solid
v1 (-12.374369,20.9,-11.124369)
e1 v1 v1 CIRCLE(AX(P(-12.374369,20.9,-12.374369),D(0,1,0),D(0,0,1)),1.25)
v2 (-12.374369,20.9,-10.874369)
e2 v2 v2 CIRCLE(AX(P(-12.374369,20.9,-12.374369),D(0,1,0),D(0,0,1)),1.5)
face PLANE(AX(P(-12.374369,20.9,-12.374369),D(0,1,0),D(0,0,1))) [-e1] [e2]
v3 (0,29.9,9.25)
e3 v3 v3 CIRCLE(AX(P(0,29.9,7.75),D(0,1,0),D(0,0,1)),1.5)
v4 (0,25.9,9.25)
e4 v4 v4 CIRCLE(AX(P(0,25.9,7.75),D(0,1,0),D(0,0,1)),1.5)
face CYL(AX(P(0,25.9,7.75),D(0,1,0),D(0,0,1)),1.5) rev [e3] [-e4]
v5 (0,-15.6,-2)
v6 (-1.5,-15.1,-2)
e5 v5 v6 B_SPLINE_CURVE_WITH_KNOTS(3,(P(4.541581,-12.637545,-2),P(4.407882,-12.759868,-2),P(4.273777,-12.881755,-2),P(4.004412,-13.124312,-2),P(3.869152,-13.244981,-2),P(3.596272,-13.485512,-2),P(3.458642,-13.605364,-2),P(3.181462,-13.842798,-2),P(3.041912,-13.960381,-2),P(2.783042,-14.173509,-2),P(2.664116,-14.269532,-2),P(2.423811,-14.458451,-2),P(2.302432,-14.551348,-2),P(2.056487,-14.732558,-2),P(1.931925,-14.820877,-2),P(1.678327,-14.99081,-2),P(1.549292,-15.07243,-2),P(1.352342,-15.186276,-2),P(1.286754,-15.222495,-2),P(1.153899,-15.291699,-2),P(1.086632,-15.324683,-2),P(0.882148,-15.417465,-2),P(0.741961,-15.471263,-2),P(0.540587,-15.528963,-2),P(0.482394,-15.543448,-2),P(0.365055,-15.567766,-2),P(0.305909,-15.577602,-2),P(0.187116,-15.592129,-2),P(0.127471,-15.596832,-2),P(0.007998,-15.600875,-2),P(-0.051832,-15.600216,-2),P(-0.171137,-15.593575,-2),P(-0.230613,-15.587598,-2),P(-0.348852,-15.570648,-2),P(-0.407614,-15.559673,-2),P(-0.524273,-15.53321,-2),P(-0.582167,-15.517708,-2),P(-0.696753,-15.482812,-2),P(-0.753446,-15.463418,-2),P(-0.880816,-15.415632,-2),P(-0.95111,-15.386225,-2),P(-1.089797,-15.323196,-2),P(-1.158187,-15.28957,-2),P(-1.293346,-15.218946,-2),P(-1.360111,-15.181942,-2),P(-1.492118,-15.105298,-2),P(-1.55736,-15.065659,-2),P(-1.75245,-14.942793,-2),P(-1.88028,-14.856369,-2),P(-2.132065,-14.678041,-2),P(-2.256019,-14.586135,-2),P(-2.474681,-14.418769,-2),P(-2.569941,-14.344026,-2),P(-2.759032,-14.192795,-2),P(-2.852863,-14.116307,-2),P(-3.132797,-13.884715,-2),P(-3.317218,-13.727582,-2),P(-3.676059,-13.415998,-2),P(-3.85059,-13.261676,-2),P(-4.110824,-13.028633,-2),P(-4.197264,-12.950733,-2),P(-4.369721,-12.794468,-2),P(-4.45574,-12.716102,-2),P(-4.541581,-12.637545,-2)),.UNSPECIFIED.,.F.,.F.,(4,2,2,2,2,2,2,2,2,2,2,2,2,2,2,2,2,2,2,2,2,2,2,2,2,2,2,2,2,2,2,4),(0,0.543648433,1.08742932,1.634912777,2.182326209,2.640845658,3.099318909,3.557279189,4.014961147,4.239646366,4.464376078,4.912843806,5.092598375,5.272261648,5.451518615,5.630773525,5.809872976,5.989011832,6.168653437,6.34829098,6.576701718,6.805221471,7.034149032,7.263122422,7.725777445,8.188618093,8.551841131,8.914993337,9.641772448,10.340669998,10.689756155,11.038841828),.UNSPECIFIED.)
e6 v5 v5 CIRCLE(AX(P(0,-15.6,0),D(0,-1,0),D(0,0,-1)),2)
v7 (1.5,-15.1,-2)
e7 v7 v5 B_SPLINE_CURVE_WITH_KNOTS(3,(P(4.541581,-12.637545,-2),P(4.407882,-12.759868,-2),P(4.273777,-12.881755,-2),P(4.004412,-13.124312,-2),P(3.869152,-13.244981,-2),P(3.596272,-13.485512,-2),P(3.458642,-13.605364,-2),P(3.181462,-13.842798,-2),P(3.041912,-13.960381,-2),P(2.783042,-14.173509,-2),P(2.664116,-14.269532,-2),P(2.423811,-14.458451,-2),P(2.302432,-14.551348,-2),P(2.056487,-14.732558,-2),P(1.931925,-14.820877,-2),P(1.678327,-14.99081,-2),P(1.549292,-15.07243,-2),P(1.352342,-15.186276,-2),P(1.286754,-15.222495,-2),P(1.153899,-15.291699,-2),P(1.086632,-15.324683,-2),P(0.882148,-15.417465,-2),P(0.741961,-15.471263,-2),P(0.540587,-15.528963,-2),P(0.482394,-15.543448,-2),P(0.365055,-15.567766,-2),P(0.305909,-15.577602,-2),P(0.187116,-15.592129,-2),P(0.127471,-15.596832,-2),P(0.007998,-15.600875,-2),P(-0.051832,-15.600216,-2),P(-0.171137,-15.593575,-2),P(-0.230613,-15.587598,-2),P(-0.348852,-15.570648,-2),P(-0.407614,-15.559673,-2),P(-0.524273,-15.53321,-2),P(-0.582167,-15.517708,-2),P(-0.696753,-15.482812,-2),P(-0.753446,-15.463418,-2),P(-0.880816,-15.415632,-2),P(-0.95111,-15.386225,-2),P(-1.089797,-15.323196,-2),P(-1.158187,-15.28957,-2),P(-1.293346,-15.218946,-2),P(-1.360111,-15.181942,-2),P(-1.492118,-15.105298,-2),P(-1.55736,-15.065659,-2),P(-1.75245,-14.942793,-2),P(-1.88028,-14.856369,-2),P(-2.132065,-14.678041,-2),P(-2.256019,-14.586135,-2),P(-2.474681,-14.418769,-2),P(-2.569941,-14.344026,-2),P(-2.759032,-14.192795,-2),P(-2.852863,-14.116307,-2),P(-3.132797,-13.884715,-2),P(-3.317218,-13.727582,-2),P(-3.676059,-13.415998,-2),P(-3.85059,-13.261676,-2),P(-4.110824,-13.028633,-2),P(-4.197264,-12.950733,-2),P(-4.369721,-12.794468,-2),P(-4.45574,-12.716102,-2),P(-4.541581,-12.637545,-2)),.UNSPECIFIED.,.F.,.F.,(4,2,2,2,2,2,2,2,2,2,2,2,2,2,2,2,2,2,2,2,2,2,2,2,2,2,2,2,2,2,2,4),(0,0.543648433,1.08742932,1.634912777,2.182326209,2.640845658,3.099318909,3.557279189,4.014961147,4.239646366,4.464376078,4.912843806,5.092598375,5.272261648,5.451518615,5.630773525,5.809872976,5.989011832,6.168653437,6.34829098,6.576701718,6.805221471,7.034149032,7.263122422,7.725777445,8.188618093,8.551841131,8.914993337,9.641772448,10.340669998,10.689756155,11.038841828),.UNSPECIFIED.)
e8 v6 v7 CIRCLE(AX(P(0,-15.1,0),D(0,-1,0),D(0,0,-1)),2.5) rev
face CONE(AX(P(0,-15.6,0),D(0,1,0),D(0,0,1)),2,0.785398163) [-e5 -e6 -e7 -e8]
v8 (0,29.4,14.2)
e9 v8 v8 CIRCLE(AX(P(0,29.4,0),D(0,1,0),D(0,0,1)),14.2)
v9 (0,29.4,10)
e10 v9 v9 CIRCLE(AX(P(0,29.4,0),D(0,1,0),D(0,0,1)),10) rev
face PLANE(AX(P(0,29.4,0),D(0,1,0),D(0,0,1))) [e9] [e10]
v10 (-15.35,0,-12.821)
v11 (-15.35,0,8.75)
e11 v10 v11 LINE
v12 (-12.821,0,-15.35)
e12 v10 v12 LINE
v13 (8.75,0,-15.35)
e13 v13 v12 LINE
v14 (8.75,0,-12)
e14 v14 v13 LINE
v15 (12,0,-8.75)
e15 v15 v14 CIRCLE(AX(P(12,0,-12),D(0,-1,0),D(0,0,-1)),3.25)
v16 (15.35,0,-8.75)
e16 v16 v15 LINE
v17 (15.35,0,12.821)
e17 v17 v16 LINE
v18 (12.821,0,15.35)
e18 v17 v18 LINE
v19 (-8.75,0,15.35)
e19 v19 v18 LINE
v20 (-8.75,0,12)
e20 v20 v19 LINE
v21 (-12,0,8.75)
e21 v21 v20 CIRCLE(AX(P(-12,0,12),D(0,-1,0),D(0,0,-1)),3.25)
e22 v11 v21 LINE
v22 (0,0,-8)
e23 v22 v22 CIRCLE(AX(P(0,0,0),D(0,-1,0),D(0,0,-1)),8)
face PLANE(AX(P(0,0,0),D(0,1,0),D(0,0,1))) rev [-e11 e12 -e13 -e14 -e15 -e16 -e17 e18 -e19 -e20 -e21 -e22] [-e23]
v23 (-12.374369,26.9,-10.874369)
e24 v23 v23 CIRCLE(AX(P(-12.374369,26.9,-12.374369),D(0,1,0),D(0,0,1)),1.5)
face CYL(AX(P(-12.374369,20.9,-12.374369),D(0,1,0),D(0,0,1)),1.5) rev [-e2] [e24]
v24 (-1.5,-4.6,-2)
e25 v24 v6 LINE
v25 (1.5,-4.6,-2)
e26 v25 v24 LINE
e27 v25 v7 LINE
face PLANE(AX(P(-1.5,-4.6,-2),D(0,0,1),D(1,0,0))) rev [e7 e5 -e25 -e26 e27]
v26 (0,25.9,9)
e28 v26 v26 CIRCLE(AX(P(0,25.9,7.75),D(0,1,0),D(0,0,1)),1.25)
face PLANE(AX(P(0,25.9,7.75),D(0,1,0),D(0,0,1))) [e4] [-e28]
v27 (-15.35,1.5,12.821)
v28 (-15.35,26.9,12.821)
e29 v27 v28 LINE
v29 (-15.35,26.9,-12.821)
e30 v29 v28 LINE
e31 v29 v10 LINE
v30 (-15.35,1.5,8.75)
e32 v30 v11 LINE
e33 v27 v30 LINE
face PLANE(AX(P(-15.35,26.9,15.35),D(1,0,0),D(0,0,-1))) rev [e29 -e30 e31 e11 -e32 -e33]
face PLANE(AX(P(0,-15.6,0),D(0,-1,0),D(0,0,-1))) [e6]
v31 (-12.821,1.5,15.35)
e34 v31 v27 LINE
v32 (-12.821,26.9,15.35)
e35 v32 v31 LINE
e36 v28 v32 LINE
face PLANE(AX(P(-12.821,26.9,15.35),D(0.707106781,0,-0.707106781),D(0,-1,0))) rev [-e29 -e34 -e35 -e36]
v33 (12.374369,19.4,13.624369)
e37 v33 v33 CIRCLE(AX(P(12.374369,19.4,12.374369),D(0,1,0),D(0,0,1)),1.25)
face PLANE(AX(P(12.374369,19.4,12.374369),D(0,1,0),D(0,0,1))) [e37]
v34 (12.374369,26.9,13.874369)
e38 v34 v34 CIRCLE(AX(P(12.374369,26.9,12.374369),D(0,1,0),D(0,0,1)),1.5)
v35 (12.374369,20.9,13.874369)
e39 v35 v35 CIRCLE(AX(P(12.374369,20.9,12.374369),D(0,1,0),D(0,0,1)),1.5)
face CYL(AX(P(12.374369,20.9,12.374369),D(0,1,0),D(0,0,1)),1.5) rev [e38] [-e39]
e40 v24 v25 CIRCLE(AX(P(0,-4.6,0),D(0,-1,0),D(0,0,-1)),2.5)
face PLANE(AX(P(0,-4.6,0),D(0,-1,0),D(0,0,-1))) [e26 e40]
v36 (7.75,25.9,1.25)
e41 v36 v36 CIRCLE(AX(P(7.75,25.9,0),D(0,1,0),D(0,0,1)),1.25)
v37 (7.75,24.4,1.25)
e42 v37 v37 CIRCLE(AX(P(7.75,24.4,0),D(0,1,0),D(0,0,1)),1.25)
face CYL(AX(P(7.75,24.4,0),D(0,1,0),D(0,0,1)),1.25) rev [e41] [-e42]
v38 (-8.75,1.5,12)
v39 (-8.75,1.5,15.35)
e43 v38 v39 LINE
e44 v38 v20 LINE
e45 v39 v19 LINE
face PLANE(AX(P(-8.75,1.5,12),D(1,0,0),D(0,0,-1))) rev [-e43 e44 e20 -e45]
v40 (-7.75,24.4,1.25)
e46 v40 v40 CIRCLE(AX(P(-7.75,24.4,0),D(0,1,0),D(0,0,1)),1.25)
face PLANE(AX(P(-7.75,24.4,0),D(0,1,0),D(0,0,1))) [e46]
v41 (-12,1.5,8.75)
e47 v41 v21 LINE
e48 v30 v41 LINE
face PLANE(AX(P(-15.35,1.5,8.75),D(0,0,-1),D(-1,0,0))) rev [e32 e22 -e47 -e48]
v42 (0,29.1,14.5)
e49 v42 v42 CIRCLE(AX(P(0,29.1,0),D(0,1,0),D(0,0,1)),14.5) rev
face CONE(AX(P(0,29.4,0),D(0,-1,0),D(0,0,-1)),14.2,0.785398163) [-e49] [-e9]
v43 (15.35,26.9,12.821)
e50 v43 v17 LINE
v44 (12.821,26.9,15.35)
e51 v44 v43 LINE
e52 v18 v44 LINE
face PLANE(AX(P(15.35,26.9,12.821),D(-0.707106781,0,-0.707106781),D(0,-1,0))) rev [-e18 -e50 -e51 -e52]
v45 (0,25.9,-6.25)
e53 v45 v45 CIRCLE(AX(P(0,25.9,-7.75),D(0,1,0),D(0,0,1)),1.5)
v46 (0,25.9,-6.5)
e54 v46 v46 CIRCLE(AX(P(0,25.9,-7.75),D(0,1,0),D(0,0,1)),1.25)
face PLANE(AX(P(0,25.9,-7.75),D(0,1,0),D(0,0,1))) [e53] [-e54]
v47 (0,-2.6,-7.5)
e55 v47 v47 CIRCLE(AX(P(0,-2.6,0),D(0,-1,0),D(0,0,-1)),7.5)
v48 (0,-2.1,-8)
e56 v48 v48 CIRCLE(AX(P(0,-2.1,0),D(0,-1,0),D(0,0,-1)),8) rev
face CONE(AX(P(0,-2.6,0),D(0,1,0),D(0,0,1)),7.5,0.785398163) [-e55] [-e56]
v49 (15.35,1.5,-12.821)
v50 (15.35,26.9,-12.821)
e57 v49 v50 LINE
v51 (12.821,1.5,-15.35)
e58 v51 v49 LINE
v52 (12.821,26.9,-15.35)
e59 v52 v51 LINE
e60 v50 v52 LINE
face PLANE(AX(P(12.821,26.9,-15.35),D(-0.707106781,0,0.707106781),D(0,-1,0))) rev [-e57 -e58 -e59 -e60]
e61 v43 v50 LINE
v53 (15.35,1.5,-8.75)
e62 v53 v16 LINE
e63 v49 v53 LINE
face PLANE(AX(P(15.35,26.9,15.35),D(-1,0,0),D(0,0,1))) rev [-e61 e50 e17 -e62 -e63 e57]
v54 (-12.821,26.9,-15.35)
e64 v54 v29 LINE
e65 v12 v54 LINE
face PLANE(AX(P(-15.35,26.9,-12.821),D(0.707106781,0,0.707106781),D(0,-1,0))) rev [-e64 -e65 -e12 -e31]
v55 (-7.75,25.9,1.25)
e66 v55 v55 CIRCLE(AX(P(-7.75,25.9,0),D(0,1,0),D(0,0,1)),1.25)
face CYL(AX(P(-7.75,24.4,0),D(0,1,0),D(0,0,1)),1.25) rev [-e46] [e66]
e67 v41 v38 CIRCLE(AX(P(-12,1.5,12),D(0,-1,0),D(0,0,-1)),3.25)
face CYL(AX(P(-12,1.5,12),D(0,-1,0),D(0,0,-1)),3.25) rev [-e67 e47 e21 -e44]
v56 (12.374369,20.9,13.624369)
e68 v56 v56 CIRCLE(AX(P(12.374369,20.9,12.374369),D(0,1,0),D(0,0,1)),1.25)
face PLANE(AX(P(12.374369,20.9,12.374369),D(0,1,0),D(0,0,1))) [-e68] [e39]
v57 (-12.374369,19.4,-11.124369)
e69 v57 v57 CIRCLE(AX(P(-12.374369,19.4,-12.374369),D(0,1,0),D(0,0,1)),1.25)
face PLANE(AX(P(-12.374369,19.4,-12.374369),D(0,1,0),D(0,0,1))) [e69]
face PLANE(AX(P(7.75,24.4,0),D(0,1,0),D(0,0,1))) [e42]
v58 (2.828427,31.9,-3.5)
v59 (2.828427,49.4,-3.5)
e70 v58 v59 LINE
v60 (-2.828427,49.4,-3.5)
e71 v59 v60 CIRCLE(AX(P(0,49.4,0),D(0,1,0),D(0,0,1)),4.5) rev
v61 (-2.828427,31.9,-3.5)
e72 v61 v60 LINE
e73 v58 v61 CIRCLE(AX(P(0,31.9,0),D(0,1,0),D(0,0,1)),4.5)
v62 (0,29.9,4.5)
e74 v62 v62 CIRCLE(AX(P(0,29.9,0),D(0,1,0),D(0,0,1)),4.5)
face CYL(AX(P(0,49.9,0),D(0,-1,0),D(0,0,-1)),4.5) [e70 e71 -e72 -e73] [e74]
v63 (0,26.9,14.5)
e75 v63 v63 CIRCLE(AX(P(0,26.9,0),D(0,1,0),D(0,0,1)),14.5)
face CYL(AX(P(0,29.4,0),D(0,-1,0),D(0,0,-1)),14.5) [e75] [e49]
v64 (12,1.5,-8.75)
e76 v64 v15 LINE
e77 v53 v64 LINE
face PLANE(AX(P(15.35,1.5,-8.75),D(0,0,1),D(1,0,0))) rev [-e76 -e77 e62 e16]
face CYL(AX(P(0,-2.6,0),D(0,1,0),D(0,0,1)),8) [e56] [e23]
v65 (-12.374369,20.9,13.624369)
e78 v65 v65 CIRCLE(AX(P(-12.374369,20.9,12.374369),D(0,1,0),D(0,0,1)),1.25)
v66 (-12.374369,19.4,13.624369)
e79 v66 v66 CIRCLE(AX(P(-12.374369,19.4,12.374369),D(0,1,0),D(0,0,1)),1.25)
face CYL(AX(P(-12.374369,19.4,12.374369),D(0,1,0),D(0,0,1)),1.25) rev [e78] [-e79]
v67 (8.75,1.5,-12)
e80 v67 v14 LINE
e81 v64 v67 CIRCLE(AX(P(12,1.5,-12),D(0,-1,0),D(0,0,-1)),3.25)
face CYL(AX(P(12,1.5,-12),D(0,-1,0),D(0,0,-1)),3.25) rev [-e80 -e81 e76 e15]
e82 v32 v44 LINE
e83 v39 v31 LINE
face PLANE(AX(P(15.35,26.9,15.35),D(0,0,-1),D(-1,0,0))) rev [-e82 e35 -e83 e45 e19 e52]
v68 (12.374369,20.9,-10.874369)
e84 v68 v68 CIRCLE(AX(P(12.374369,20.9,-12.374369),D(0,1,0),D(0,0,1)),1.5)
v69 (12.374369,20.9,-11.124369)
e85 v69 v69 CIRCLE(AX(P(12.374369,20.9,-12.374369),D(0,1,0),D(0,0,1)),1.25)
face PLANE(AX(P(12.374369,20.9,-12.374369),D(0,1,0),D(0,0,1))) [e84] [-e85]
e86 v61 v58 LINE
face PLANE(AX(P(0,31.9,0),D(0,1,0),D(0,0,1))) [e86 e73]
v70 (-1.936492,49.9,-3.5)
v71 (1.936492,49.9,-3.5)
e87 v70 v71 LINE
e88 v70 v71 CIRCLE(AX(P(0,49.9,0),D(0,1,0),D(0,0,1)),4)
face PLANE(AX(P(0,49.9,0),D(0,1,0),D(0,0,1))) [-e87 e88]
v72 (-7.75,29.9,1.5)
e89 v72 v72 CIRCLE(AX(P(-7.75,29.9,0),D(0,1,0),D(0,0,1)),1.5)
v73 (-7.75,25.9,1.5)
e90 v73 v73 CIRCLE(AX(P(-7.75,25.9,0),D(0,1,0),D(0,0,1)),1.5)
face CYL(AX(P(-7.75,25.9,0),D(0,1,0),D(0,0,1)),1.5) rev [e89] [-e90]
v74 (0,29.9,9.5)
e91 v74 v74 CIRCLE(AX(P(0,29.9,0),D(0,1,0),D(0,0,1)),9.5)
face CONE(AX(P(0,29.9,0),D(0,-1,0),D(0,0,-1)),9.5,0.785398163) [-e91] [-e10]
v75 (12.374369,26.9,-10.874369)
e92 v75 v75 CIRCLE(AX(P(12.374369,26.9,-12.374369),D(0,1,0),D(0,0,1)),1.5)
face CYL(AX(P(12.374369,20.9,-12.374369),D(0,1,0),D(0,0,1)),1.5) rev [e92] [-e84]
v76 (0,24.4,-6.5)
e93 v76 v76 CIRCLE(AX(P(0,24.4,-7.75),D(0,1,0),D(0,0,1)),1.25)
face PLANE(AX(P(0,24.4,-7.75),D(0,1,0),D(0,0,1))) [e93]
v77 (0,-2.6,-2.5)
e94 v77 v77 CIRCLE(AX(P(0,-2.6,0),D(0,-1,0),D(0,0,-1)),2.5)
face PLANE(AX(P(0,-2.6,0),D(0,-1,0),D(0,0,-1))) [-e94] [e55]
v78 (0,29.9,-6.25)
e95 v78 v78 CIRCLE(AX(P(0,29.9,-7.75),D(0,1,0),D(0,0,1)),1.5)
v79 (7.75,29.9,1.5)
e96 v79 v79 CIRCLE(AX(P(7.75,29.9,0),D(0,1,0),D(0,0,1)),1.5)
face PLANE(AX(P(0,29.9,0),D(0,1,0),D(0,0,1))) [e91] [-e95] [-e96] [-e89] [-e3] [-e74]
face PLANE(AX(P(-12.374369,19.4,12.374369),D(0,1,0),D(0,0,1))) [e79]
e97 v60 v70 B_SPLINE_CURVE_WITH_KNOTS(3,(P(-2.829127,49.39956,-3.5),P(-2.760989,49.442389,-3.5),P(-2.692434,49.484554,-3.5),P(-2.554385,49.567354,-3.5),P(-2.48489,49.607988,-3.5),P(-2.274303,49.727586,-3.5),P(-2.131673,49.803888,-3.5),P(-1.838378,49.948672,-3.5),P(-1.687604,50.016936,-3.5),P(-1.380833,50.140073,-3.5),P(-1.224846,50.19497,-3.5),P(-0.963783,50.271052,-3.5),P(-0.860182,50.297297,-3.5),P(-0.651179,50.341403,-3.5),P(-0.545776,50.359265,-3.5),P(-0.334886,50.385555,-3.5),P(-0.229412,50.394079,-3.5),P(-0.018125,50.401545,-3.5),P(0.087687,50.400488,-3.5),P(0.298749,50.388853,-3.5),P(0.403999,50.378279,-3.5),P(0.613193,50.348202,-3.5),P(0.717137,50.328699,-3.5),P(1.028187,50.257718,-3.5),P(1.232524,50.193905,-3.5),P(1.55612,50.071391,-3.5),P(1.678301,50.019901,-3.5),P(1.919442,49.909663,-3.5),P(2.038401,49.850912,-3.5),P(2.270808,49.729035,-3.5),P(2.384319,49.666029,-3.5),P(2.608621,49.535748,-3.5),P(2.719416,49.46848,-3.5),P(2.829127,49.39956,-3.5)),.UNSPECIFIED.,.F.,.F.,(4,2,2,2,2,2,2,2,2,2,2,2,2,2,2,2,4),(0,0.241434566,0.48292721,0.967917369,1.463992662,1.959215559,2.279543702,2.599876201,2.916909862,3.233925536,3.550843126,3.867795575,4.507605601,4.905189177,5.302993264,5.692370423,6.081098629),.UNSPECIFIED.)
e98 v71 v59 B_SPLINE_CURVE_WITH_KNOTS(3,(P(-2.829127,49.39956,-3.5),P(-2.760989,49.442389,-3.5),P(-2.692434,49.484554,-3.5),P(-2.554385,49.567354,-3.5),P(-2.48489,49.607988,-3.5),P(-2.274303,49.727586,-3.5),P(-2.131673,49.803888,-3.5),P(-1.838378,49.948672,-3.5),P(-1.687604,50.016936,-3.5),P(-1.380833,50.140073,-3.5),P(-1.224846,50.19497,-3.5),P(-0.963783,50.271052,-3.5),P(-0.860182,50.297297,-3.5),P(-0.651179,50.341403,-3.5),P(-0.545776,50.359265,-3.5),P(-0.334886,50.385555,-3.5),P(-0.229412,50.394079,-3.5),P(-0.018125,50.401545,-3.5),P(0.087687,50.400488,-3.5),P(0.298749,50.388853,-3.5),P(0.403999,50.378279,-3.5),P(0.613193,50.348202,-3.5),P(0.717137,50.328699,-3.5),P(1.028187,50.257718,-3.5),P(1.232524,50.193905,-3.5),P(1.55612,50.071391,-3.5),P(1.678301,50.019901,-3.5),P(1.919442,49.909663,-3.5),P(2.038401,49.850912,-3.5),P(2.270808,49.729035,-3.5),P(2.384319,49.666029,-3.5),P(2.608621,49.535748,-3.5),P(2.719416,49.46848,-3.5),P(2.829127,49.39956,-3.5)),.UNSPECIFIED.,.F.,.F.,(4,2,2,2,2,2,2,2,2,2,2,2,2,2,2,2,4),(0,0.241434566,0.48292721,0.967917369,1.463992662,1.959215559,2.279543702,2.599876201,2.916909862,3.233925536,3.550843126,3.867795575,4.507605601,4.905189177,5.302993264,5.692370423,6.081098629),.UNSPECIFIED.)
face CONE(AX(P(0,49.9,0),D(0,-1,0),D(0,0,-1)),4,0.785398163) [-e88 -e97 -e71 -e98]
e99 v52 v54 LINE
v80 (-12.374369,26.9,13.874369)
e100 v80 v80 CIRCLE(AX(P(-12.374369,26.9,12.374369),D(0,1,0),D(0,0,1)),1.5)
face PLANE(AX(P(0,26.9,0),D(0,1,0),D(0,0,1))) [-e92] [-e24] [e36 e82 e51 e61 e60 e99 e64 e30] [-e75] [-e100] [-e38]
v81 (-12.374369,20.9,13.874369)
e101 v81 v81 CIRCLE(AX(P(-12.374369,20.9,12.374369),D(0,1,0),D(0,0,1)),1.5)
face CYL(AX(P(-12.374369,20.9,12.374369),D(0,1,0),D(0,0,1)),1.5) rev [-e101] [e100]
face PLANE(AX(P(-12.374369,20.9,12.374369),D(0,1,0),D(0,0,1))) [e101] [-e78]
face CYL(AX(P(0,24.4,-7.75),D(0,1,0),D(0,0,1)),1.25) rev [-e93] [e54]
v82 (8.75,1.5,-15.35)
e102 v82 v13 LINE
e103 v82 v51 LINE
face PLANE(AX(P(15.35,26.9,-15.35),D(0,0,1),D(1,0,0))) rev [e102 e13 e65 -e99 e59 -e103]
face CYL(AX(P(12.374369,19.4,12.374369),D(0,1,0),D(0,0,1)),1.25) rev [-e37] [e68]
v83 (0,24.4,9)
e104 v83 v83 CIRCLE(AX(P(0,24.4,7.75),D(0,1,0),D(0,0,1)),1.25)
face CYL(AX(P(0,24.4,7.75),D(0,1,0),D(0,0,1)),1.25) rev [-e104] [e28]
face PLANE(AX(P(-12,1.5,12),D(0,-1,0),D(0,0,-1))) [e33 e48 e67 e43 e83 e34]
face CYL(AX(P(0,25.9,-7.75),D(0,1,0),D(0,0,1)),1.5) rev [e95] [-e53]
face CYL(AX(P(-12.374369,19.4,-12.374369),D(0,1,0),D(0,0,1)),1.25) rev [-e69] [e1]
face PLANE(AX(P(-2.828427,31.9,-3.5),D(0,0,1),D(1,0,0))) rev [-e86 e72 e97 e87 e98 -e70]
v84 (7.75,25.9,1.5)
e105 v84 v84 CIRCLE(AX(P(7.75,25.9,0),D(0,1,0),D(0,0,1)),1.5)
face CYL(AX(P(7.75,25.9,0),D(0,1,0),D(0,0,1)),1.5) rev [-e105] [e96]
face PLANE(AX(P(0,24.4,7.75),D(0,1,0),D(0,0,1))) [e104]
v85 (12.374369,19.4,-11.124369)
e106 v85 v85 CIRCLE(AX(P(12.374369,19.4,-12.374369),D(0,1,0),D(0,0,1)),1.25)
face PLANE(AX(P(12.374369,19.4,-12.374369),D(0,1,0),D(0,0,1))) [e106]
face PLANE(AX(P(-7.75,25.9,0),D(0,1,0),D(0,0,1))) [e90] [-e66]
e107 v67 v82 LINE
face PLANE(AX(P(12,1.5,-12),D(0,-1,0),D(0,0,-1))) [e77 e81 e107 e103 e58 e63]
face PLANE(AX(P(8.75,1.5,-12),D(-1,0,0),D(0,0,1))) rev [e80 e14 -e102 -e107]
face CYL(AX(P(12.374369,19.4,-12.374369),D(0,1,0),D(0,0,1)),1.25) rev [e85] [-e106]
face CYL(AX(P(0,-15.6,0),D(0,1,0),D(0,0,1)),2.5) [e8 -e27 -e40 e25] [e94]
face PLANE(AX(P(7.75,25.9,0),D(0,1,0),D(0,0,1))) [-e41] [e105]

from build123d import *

# Parameters (mm, degrees)
SKETCH_1_W          = 30.7
SKETCH_1_H          = 30.7
EXTRUDE_1_DEPTH     = 26.9
SKETCH_2_R          = 14.5
EXTRUDE_2_DEPTH     = 2.5
SKETCH_3_R          = 9.5
EXTRUDE_3_DEPTH     = 0.5
CHAMFER_1_SIZE      = 0.5
CHAMFER_2_SIZE      = 0.3
SKETCH_4_R          = 4.5
EXTRUDE_4_DEPTH     = 20
SKETCH_5_R          = 8
EXTRUDE_5_DEPTH     = 2.6
SKETCH_6_R          = 2.5
EXTRUDE_6_DEPTH     = 13
CHAMFER_3_SIZE      = 0.5
CUT_EXTRUDE_1_DEPTH = 1.5
SKETCH_8_R          = 1.5
CUT_EXTRUDE_2_DEPTH = 6
SKETCH_9_R          = 1.25
CUT_EXTRUDE_3_DEPTH = 1.5
SKETCH_10_R         = 1.5
CUT_EXTRUDE_4_DEPTH = 4
SKETCH_11_R         = 1.25
CUT_EXTRUDE_5_DEPTH = 1.5
CHAMFER_4_SIZE      = 2.529
CHAMFER_5_SIZE      = 0.5
CUT_EXTRUDE_START   = -18
CUT_EXTRUDE_6_DEPTH = 18
CUT_EXTRUDE_START_2 = -11
CUT_EXTRUDE_7_DEPTH = 11


with BuildPart() as part:
    # 草图1 → 凸台-拉伸1 (new body)
    with BuildSketch(Plane(origin=(0, 0, 0), x_dir=(1, 0, 0), z_dir=(0, 1, 0))):
        Rectangle(SKETCH_1_W, SKETCH_1_H)
    extrude(amount=EXTRUDE_1_DEPTH)

    # 草图2 → 凸台-拉伸2 (add)
    with BuildSketch(Plane(origin=(0, 26.9, 0), x_dir=(1, 0, 0), z_dir=(0, 1, 0))):
        with Locations(Location((0, 0, 0), (0, 0, 270))):
            Circle(SKETCH_2_R)
    extrude(amount=EXTRUDE_2_DEPTH)

    # 草图3 → 凸台-拉伸3 (add)
    with BuildSketch(Plane(origin=(0, 29.4, 0), x_dir=(1, 0, 0), z_dir=(0, 1, 0))):
        with Locations(Location((0, 0, 0), (0, 0, 270))):
            Circle(SKETCH_3_R)
    extrude(amount=EXTRUDE_3_DEPTH)

    # 倒角1
    chamfer_1_edges = [part.edges().sort_by_distance(p)[0] for p in [
        (0, 29.4, -9.5),
    ]]
    chamfer(chamfer_1_edges, length=CHAMFER_1_SIZE - 0.0001)  # a hair under: the kernel refuses the full size

    # 倒角2
    chamfer_2_edges = [part.edges().sort_by_distance(p)[0] for p in [
        (0, 29.4, -14.5),
    ]]
    chamfer(chamfer_2_edges, length=CHAMFER_2_SIZE)

    # 草图4 → 凸台-拉伸4 (add)
    with BuildSketch(Plane(origin=(0, 29.9, 0), x_dir=(1, 0, 0), z_dir=(0, 1, 0))):
        with Locations(Location((0, 0, 0), (0, 0, 270))):
            Circle(SKETCH_4_R)
    extrude(amount=EXTRUDE_4_DEPTH)

    # 草图5 → 凸台-拉伸5 (add)
    with BuildSketch(Plane.XZ):
        with Locations(Location((0, 0, 0), (0, 0, 270))):
            Circle(SKETCH_5_R)
    extrude(amount=EXTRUDE_5_DEPTH)

    # 草图6 → 凸台-拉伸6 (add)
    with BuildSketch(Plane.XZ.offset(2.6)):
        with Locations(Location((0, 0, 0), (0, 0, 90))):
            Circle(SKETCH_6_R)
    extrude(amount=EXTRUDE_6_DEPTH)

    # 倒角3
    chamfer_3_edges = [part.edges().sort_by_distance(p)[0] for p in [
        (0, -2.6, 8),
        (0, -15.6, -2.5),
    ]]
    chamfer(chamfer_3_edges, length=CHAMFER_3_SIZE)

    # 草图7 → 切除-拉伸1 (cut)
    with BuildSketch(Plane.XZ):
        with BuildLine():
            Line((-15.35, 8.75), (-12, 8.75))
            ThreePointArc((-12, 8.75), (-9.701902961, 9.701902961), (-8.75, 12))
            Line((-8.75, 12), (-8.75, 15.35))
            Line((-8.75, 15.35), (-15.35, 15.35))
            Line((-15.35, 15.35), (-15.35, 8.75))
        make_face()
        with BuildLine():
            Line((15.35, -15.35), (15.35, -8.75))
            Line((15.35, -8.75), (12, -8.75))
            ThreePointArc((12, -8.75), (9.701902961, -9.701902961), (8.75, -12))
            Line((8.75, -12), (8.75, -15.35))
            Line((8.75, -15.35), (15.35, -15.35))
        make_face()
    extrude(amount=-CUT_EXTRUDE_1_DEPTH, mode=Mode.SUBTRACT)

    # 草图8 → 切除-拉伸2 (cut)
    with BuildSketch(Plane(origin=(0, 26.9, 0), x_dir=(1, 0, 0), z_dir=(0, 1, 0))):
        with Locations(Location((-12.374368671, 12.374368671, 0), (0, 0, 270))):
            Circle(SKETCH_8_R)
        with Locations(Location((12.374368671, 12.374368671, 0), (0, 0, 270))):
            Circle(SKETCH_8_R)
        with Locations(Location((12.374368671, -12.374368671, 0), (0, 0, 270))):
            Circle(SKETCH_8_R)
        with Locations(Location((-12.374368671, -12.374368671, 0), (0, 0, 270))):
            Circle(SKETCH_8_R)
    extrude(amount=-CUT_EXTRUDE_2_DEPTH, mode=Mode.SUBTRACT)

    # 草图9 → 切除-拉伸3 (cut)
    with BuildSketch(Plane(origin=(0, 20.9, 0), x_dir=(1, 0, 0), z_dir=(0, 1, 0))):
        with Locations(Location((12.374368671, -12.374368671, 0), (0, 0, 270))):
            Circle(SKETCH_9_R)
        with Locations(Location((12.374368671, 12.374368671, 0), (0, 0, 270))):
            Circle(SKETCH_9_R)
        with Locations(Location((-12.374368671, 12.374368671, 0), (0, 0, 270))):
            Circle(SKETCH_9_R)
        with Locations(Location((-12.374368671, -12.374368671, 0), (0, 0, 270))):
            Circle(SKETCH_9_R)
    extrude(amount=-CUT_EXTRUDE_3_DEPTH, mode=Mode.SUBTRACT)

    # 草图10 → 切除-拉伸4 (cut)
    with BuildSketch(Plane(origin=(0, 29.9, 0), x_dir=(1, 0, 0), z_dir=(0, 1, 0))):
        with Locations(Location((-7.75, 0, 0), (0, 0, 270))):
            Circle(SKETCH_10_R)
        with Locations(Location((0, 7.75, 0), (0, 0, 270))):
            Circle(SKETCH_10_R)
        with Locations(Location((7.75, 0, 0), (0, 0, 270))):
            Circle(SKETCH_10_R)
        with Locations(Location((0, -7.75, 0), (0, 0, 270))):
            Circle(SKETCH_10_R)
    extrude(amount=-CUT_EXTRUDE_4_DEPTH, mode=Mode.SUBTRACT)

    # 草图11 → 切除-拉伸5 (cut)
    with BuildSketch(Plane(origin=(0, 25.9, 0), x_dir=(1, 0, 0), z_dir=(0, 1, 0))):
        with Locations(Location((0, 7.75, 0), (0, 0, 270))):
            Circle(SKETCH_11_R)
        with Locations(Location((-7.75, 0, 0), (0, 0, 270))):
            Circle(SKETCH_11_R)
        with Locations(Location((7.75, 0, 0), (0, 0, 270))):
            Circle(SKETCH_11_R)
        with Locations(Location((0, -7.75, 0), (0, 0, 270))):
            Circle(SKETCH_11_R)
    extrude(amount=-CUT_EXTRUDE_5_DEPTH, mode=Mode.SUBTRACT)

    # 倒角4
    chamfer_4_edges = [part.edges().sort_by_distance(p)[0] for p in [
        (-15.35, 13.45, -15.35),
        (15.35, 14.2, -15.35),
        (15.35, 13.45, 15.35),
        (-15.35, 14.2, 15.35),
    ]]
    chamfer(chamfer_4_edges, length=CHAMFER_4_SIZE)

    # 倒角5
    chamfer_5_edges = [part.edges().sort_by_distance(p)[0] for p in [
        (0, 49.9, -4.5),
    ]]
    chamfer(chamfer_5_edges, length=CHAMFER_5_SIZE)

    # 草图12 → 切除-拉伸6 (cut)
    with BuildSketch(Plane(origin=(0, 49.9, 0), x_dir=(1, 0, 0), z_dir=(0, 1, 0)).offset(CUT_EXTRUDE_START)):
        with BuildLine():
            Line((-2.828427125, 3.5), (2.828427125, 3.5))
            ThreePointArc((2.828427125, 3.5), (0, 4.5), (-2.828427125, 3.5))
        make_face()
    extrude(amount=CUT_EXTRUDE_6_DEPTH, mode=Mode.SUBTRACT)

    # 草图13 → 切除-拉伸7 (cut)
    with BuildSketch(Plane.XZ.offset(15.6).offset(CUT_EXTRUDE_START_2)):
        with BuildLine():
            Line((-1.5, -2), (1.5, -2))
            ThreePointArc((1.5, -2), (0, -2.5), (-1.5, -2))
        make_face()
    extrude(amount=CUT_EXTRUDE_7_DEPTH, mode=Mode.SUBTRACT)


solid = part.part
